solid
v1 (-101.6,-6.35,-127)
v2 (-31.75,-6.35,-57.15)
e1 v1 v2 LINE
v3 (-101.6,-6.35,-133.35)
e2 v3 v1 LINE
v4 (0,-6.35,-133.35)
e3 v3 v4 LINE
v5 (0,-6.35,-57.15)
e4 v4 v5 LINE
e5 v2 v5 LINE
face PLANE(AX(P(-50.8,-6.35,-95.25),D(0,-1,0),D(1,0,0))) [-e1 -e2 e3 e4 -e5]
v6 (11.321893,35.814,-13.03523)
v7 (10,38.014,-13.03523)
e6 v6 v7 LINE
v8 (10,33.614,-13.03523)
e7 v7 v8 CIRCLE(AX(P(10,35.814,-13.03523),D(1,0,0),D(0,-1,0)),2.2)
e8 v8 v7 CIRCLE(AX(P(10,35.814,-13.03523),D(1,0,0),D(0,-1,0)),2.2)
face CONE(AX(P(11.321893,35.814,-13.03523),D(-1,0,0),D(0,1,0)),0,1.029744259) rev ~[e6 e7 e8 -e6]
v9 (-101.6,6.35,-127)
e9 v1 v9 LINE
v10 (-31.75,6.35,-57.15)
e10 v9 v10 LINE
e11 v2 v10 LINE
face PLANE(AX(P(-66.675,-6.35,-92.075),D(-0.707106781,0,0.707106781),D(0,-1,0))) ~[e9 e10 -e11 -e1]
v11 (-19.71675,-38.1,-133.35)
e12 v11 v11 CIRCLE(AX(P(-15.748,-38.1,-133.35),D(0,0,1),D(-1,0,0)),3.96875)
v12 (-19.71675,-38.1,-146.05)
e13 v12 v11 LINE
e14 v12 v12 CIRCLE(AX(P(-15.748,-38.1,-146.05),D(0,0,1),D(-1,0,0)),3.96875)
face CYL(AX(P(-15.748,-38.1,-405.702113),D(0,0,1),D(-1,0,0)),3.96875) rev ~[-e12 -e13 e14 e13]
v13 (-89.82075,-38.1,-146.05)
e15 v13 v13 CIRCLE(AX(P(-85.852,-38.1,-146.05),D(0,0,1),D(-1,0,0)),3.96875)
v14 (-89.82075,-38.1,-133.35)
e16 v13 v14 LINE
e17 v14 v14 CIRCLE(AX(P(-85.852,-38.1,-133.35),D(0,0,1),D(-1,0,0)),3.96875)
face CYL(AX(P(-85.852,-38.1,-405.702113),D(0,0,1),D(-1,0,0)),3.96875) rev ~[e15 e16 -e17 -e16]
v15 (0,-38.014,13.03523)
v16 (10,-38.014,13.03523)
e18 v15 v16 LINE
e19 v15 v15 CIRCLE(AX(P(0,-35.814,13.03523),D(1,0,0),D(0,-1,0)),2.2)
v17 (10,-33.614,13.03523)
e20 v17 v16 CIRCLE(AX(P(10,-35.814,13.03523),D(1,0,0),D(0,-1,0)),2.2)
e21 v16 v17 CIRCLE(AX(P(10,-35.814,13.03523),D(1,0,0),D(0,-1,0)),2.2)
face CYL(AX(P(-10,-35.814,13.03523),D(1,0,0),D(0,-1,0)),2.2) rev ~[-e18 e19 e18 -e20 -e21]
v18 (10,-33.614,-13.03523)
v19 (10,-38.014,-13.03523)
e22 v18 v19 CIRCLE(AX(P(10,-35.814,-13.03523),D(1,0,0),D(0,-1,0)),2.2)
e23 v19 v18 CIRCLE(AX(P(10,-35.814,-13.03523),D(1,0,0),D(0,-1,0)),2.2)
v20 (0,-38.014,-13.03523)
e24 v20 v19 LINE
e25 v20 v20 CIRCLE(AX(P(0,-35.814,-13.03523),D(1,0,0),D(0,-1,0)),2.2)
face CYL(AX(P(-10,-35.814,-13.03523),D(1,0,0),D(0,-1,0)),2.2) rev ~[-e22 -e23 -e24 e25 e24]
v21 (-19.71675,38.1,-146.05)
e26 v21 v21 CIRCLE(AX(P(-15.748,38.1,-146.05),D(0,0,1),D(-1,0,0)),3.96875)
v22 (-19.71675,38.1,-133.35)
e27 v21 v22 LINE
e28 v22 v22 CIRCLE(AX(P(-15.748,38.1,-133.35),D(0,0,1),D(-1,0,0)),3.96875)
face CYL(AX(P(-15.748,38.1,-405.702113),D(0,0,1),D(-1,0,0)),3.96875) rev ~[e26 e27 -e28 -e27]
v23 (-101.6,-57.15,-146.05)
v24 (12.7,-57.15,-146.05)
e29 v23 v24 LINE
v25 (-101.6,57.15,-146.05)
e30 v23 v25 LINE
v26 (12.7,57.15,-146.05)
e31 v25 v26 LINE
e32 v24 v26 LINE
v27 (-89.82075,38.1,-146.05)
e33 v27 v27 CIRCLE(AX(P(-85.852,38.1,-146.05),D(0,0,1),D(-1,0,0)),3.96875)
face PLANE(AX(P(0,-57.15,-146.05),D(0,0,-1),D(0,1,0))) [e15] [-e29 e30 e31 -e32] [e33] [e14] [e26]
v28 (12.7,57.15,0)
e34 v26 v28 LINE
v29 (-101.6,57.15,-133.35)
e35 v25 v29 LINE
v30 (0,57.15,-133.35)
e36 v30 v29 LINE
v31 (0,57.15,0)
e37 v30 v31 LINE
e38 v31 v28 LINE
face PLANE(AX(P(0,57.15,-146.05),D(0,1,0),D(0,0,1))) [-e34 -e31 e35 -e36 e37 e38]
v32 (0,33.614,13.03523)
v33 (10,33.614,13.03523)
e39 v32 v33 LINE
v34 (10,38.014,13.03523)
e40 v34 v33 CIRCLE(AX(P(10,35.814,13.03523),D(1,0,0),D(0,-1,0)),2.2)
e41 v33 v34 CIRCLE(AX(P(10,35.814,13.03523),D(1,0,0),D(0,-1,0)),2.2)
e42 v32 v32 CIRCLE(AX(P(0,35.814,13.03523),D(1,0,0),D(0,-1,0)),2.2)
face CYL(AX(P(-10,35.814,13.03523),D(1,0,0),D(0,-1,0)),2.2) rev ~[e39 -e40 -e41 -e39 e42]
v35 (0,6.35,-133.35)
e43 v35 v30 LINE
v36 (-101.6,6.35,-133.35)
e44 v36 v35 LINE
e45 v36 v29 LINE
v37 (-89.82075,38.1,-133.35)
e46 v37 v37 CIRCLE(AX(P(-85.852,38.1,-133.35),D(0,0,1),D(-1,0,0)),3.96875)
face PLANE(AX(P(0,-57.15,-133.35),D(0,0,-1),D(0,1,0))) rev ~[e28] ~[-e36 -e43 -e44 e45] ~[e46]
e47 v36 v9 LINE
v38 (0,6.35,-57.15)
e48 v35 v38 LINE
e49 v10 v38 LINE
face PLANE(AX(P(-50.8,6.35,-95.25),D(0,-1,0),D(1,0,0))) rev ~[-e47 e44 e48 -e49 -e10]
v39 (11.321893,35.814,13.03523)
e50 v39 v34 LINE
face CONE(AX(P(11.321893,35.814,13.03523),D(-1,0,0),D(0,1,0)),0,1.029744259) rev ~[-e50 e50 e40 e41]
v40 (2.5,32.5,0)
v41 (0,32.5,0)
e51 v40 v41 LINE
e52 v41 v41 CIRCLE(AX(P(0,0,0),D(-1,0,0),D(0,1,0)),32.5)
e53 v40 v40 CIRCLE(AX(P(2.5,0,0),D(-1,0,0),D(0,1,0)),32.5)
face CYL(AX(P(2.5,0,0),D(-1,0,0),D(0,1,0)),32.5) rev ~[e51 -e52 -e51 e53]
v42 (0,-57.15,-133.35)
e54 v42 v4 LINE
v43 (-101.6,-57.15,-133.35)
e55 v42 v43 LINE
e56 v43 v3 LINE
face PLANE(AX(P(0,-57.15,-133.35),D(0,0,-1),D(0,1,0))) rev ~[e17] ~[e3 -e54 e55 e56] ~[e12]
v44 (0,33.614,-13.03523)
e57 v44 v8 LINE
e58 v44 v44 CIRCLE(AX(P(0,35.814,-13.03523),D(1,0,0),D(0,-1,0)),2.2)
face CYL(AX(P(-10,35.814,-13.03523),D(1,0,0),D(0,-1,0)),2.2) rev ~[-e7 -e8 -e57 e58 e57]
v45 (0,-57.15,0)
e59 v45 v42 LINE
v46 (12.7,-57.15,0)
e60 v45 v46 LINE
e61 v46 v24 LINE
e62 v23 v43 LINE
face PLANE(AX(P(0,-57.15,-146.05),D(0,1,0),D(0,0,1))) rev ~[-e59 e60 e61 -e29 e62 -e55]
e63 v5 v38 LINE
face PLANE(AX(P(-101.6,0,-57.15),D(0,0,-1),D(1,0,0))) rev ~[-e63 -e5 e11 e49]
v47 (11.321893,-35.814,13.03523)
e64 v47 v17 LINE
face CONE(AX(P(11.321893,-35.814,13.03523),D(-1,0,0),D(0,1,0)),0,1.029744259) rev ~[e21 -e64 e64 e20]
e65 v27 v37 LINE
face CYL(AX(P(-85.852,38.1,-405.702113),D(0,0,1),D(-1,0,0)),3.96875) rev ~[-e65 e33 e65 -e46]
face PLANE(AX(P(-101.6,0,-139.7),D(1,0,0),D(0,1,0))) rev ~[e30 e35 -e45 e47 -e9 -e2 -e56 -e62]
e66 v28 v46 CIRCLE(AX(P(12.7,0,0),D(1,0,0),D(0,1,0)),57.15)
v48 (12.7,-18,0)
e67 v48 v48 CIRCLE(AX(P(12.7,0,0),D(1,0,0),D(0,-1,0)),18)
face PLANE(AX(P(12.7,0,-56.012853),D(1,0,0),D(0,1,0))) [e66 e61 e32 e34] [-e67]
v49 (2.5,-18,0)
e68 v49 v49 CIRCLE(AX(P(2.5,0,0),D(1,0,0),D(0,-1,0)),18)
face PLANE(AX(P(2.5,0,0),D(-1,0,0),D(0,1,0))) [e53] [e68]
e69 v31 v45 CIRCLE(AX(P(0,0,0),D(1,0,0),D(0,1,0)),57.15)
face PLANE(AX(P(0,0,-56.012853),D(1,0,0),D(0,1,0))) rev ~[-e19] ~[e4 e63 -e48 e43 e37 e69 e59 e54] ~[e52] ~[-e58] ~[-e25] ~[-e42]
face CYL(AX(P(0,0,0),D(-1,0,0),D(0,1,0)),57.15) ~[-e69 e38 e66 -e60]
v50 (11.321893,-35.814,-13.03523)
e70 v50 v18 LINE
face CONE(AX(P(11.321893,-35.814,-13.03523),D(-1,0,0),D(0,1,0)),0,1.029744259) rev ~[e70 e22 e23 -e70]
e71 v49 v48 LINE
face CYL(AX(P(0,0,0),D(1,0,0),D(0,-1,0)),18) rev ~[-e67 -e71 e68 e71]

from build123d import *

# Parameters (mm, degrees)
F1_DEPTH       = 12.7
F2_D           = 36
F2_DEPTH       = 36
F2_CBORE_D     = 65
F2_CBORE_DEPTH = 2.5
F2_TIP         = 10.8154911425
F4_D           = 4.4
F4_DEPTH       = 10
F4_TIP         = 1.3218933619
F5_W           = 114.3
F5_H           = 12.7
F6_DEPTH       = 101.6
F7_W           = 101.6
F7_H           = 76.2
F8_DEPTH       = 6.35
F9_SIZE        = 69.85
F11_D          = 7.9375


# Not quite as in the source:
# - a length typed as a fraction of an inch, garbled in the dataset ("3 / 203.2 mm" for 3/8 in), is restored


with BuildPart() as f1:
    # F0 (on Right) → F1 (new body)
    with BuildSketch(Plane.YZ):
        with BuildLine():
            Line((57.15, -146.05), (57.15, 0))
            ThreePointArc((57.15, 0), (0, 57.15), (-57.15, 0))
            Line((-57.15, 0), (-57.15, -146.05))
            Line((-57.15, -146.05), (57.15, -146.05))
        make_face()
    extrude(amount=F1_DEPTH)

    # F2
    with Locations(Plane(origin=(0, 0, 0), x_dir=(0, 1, 0), z_dir=(-1, 0, 0))):
        with Locations((0, 0)):
            CounterBoreHole(F2_D / 2, F2_CBORE_D / 2, F2_CBORE_DEPTH, depth=F2_DEPTH)
            with Locations((0, 0, -(F2_DEPTH + F2_TIP / 2))):  # 118° drill point
                Cone(0, F2_D / 2, F2_TIP, mode=Mode.SUBTRACT)

    # F4
    with Locations(Plane(origin=(0, 0, 0), x_dir=(0, 1, 0), z_dir=(-1, 0, 0))):
        with Locations((35.814, -13.03522997), (35.814, 13.03522997), (-35.814, -13.03522997), (-35.814, 13.03522997)):
            Hole(F4_D / 2, depth=F4_DEPTH)
            with Locations((0, 0, -(F4_DEPTH + F4_TIP / 2))):  # 118° drill point
                Cone(0, F4_D / 2, F4_TIP, mode=Mode.SUBTRACT)

    # F5 (on face) → F6 (join)
    with BuildSketch(Plane.YZ):
        with Locations((0, -139.7)):
            Rectangle(F5_W, F5_H)
    extrude(amount=-F6_DEPTH)

    # F7 (on Front) → F8 (join, symmetric)
    with BuildSketch(Plane.XZ):
        with Locations((-50.8, -95.25)):
            Rectangle(F7_W, F7_H)
    extrude(amount=F8_DEPTH, both=True)

    # F9
    f9_edges = [f1.edges().sort_by_distance(p)[0] for p in [
        (-101.6, 0, -57.15),
    ]]
    chamfer(f9_edges, length=F9_SIZE)

    # F11 (through all)
    with Locations(Plane(origin=(0, 0, -146.05), x_dir=(1, 0, 0), z_dir=(0, 0, -1))):
        with Locations((-85.852, 38.1), (-15.748, 38.1), (-85.852, -38.1), (-15.748, -38.1)):
            Hole(F11_D / 2)


solid = f1.part
